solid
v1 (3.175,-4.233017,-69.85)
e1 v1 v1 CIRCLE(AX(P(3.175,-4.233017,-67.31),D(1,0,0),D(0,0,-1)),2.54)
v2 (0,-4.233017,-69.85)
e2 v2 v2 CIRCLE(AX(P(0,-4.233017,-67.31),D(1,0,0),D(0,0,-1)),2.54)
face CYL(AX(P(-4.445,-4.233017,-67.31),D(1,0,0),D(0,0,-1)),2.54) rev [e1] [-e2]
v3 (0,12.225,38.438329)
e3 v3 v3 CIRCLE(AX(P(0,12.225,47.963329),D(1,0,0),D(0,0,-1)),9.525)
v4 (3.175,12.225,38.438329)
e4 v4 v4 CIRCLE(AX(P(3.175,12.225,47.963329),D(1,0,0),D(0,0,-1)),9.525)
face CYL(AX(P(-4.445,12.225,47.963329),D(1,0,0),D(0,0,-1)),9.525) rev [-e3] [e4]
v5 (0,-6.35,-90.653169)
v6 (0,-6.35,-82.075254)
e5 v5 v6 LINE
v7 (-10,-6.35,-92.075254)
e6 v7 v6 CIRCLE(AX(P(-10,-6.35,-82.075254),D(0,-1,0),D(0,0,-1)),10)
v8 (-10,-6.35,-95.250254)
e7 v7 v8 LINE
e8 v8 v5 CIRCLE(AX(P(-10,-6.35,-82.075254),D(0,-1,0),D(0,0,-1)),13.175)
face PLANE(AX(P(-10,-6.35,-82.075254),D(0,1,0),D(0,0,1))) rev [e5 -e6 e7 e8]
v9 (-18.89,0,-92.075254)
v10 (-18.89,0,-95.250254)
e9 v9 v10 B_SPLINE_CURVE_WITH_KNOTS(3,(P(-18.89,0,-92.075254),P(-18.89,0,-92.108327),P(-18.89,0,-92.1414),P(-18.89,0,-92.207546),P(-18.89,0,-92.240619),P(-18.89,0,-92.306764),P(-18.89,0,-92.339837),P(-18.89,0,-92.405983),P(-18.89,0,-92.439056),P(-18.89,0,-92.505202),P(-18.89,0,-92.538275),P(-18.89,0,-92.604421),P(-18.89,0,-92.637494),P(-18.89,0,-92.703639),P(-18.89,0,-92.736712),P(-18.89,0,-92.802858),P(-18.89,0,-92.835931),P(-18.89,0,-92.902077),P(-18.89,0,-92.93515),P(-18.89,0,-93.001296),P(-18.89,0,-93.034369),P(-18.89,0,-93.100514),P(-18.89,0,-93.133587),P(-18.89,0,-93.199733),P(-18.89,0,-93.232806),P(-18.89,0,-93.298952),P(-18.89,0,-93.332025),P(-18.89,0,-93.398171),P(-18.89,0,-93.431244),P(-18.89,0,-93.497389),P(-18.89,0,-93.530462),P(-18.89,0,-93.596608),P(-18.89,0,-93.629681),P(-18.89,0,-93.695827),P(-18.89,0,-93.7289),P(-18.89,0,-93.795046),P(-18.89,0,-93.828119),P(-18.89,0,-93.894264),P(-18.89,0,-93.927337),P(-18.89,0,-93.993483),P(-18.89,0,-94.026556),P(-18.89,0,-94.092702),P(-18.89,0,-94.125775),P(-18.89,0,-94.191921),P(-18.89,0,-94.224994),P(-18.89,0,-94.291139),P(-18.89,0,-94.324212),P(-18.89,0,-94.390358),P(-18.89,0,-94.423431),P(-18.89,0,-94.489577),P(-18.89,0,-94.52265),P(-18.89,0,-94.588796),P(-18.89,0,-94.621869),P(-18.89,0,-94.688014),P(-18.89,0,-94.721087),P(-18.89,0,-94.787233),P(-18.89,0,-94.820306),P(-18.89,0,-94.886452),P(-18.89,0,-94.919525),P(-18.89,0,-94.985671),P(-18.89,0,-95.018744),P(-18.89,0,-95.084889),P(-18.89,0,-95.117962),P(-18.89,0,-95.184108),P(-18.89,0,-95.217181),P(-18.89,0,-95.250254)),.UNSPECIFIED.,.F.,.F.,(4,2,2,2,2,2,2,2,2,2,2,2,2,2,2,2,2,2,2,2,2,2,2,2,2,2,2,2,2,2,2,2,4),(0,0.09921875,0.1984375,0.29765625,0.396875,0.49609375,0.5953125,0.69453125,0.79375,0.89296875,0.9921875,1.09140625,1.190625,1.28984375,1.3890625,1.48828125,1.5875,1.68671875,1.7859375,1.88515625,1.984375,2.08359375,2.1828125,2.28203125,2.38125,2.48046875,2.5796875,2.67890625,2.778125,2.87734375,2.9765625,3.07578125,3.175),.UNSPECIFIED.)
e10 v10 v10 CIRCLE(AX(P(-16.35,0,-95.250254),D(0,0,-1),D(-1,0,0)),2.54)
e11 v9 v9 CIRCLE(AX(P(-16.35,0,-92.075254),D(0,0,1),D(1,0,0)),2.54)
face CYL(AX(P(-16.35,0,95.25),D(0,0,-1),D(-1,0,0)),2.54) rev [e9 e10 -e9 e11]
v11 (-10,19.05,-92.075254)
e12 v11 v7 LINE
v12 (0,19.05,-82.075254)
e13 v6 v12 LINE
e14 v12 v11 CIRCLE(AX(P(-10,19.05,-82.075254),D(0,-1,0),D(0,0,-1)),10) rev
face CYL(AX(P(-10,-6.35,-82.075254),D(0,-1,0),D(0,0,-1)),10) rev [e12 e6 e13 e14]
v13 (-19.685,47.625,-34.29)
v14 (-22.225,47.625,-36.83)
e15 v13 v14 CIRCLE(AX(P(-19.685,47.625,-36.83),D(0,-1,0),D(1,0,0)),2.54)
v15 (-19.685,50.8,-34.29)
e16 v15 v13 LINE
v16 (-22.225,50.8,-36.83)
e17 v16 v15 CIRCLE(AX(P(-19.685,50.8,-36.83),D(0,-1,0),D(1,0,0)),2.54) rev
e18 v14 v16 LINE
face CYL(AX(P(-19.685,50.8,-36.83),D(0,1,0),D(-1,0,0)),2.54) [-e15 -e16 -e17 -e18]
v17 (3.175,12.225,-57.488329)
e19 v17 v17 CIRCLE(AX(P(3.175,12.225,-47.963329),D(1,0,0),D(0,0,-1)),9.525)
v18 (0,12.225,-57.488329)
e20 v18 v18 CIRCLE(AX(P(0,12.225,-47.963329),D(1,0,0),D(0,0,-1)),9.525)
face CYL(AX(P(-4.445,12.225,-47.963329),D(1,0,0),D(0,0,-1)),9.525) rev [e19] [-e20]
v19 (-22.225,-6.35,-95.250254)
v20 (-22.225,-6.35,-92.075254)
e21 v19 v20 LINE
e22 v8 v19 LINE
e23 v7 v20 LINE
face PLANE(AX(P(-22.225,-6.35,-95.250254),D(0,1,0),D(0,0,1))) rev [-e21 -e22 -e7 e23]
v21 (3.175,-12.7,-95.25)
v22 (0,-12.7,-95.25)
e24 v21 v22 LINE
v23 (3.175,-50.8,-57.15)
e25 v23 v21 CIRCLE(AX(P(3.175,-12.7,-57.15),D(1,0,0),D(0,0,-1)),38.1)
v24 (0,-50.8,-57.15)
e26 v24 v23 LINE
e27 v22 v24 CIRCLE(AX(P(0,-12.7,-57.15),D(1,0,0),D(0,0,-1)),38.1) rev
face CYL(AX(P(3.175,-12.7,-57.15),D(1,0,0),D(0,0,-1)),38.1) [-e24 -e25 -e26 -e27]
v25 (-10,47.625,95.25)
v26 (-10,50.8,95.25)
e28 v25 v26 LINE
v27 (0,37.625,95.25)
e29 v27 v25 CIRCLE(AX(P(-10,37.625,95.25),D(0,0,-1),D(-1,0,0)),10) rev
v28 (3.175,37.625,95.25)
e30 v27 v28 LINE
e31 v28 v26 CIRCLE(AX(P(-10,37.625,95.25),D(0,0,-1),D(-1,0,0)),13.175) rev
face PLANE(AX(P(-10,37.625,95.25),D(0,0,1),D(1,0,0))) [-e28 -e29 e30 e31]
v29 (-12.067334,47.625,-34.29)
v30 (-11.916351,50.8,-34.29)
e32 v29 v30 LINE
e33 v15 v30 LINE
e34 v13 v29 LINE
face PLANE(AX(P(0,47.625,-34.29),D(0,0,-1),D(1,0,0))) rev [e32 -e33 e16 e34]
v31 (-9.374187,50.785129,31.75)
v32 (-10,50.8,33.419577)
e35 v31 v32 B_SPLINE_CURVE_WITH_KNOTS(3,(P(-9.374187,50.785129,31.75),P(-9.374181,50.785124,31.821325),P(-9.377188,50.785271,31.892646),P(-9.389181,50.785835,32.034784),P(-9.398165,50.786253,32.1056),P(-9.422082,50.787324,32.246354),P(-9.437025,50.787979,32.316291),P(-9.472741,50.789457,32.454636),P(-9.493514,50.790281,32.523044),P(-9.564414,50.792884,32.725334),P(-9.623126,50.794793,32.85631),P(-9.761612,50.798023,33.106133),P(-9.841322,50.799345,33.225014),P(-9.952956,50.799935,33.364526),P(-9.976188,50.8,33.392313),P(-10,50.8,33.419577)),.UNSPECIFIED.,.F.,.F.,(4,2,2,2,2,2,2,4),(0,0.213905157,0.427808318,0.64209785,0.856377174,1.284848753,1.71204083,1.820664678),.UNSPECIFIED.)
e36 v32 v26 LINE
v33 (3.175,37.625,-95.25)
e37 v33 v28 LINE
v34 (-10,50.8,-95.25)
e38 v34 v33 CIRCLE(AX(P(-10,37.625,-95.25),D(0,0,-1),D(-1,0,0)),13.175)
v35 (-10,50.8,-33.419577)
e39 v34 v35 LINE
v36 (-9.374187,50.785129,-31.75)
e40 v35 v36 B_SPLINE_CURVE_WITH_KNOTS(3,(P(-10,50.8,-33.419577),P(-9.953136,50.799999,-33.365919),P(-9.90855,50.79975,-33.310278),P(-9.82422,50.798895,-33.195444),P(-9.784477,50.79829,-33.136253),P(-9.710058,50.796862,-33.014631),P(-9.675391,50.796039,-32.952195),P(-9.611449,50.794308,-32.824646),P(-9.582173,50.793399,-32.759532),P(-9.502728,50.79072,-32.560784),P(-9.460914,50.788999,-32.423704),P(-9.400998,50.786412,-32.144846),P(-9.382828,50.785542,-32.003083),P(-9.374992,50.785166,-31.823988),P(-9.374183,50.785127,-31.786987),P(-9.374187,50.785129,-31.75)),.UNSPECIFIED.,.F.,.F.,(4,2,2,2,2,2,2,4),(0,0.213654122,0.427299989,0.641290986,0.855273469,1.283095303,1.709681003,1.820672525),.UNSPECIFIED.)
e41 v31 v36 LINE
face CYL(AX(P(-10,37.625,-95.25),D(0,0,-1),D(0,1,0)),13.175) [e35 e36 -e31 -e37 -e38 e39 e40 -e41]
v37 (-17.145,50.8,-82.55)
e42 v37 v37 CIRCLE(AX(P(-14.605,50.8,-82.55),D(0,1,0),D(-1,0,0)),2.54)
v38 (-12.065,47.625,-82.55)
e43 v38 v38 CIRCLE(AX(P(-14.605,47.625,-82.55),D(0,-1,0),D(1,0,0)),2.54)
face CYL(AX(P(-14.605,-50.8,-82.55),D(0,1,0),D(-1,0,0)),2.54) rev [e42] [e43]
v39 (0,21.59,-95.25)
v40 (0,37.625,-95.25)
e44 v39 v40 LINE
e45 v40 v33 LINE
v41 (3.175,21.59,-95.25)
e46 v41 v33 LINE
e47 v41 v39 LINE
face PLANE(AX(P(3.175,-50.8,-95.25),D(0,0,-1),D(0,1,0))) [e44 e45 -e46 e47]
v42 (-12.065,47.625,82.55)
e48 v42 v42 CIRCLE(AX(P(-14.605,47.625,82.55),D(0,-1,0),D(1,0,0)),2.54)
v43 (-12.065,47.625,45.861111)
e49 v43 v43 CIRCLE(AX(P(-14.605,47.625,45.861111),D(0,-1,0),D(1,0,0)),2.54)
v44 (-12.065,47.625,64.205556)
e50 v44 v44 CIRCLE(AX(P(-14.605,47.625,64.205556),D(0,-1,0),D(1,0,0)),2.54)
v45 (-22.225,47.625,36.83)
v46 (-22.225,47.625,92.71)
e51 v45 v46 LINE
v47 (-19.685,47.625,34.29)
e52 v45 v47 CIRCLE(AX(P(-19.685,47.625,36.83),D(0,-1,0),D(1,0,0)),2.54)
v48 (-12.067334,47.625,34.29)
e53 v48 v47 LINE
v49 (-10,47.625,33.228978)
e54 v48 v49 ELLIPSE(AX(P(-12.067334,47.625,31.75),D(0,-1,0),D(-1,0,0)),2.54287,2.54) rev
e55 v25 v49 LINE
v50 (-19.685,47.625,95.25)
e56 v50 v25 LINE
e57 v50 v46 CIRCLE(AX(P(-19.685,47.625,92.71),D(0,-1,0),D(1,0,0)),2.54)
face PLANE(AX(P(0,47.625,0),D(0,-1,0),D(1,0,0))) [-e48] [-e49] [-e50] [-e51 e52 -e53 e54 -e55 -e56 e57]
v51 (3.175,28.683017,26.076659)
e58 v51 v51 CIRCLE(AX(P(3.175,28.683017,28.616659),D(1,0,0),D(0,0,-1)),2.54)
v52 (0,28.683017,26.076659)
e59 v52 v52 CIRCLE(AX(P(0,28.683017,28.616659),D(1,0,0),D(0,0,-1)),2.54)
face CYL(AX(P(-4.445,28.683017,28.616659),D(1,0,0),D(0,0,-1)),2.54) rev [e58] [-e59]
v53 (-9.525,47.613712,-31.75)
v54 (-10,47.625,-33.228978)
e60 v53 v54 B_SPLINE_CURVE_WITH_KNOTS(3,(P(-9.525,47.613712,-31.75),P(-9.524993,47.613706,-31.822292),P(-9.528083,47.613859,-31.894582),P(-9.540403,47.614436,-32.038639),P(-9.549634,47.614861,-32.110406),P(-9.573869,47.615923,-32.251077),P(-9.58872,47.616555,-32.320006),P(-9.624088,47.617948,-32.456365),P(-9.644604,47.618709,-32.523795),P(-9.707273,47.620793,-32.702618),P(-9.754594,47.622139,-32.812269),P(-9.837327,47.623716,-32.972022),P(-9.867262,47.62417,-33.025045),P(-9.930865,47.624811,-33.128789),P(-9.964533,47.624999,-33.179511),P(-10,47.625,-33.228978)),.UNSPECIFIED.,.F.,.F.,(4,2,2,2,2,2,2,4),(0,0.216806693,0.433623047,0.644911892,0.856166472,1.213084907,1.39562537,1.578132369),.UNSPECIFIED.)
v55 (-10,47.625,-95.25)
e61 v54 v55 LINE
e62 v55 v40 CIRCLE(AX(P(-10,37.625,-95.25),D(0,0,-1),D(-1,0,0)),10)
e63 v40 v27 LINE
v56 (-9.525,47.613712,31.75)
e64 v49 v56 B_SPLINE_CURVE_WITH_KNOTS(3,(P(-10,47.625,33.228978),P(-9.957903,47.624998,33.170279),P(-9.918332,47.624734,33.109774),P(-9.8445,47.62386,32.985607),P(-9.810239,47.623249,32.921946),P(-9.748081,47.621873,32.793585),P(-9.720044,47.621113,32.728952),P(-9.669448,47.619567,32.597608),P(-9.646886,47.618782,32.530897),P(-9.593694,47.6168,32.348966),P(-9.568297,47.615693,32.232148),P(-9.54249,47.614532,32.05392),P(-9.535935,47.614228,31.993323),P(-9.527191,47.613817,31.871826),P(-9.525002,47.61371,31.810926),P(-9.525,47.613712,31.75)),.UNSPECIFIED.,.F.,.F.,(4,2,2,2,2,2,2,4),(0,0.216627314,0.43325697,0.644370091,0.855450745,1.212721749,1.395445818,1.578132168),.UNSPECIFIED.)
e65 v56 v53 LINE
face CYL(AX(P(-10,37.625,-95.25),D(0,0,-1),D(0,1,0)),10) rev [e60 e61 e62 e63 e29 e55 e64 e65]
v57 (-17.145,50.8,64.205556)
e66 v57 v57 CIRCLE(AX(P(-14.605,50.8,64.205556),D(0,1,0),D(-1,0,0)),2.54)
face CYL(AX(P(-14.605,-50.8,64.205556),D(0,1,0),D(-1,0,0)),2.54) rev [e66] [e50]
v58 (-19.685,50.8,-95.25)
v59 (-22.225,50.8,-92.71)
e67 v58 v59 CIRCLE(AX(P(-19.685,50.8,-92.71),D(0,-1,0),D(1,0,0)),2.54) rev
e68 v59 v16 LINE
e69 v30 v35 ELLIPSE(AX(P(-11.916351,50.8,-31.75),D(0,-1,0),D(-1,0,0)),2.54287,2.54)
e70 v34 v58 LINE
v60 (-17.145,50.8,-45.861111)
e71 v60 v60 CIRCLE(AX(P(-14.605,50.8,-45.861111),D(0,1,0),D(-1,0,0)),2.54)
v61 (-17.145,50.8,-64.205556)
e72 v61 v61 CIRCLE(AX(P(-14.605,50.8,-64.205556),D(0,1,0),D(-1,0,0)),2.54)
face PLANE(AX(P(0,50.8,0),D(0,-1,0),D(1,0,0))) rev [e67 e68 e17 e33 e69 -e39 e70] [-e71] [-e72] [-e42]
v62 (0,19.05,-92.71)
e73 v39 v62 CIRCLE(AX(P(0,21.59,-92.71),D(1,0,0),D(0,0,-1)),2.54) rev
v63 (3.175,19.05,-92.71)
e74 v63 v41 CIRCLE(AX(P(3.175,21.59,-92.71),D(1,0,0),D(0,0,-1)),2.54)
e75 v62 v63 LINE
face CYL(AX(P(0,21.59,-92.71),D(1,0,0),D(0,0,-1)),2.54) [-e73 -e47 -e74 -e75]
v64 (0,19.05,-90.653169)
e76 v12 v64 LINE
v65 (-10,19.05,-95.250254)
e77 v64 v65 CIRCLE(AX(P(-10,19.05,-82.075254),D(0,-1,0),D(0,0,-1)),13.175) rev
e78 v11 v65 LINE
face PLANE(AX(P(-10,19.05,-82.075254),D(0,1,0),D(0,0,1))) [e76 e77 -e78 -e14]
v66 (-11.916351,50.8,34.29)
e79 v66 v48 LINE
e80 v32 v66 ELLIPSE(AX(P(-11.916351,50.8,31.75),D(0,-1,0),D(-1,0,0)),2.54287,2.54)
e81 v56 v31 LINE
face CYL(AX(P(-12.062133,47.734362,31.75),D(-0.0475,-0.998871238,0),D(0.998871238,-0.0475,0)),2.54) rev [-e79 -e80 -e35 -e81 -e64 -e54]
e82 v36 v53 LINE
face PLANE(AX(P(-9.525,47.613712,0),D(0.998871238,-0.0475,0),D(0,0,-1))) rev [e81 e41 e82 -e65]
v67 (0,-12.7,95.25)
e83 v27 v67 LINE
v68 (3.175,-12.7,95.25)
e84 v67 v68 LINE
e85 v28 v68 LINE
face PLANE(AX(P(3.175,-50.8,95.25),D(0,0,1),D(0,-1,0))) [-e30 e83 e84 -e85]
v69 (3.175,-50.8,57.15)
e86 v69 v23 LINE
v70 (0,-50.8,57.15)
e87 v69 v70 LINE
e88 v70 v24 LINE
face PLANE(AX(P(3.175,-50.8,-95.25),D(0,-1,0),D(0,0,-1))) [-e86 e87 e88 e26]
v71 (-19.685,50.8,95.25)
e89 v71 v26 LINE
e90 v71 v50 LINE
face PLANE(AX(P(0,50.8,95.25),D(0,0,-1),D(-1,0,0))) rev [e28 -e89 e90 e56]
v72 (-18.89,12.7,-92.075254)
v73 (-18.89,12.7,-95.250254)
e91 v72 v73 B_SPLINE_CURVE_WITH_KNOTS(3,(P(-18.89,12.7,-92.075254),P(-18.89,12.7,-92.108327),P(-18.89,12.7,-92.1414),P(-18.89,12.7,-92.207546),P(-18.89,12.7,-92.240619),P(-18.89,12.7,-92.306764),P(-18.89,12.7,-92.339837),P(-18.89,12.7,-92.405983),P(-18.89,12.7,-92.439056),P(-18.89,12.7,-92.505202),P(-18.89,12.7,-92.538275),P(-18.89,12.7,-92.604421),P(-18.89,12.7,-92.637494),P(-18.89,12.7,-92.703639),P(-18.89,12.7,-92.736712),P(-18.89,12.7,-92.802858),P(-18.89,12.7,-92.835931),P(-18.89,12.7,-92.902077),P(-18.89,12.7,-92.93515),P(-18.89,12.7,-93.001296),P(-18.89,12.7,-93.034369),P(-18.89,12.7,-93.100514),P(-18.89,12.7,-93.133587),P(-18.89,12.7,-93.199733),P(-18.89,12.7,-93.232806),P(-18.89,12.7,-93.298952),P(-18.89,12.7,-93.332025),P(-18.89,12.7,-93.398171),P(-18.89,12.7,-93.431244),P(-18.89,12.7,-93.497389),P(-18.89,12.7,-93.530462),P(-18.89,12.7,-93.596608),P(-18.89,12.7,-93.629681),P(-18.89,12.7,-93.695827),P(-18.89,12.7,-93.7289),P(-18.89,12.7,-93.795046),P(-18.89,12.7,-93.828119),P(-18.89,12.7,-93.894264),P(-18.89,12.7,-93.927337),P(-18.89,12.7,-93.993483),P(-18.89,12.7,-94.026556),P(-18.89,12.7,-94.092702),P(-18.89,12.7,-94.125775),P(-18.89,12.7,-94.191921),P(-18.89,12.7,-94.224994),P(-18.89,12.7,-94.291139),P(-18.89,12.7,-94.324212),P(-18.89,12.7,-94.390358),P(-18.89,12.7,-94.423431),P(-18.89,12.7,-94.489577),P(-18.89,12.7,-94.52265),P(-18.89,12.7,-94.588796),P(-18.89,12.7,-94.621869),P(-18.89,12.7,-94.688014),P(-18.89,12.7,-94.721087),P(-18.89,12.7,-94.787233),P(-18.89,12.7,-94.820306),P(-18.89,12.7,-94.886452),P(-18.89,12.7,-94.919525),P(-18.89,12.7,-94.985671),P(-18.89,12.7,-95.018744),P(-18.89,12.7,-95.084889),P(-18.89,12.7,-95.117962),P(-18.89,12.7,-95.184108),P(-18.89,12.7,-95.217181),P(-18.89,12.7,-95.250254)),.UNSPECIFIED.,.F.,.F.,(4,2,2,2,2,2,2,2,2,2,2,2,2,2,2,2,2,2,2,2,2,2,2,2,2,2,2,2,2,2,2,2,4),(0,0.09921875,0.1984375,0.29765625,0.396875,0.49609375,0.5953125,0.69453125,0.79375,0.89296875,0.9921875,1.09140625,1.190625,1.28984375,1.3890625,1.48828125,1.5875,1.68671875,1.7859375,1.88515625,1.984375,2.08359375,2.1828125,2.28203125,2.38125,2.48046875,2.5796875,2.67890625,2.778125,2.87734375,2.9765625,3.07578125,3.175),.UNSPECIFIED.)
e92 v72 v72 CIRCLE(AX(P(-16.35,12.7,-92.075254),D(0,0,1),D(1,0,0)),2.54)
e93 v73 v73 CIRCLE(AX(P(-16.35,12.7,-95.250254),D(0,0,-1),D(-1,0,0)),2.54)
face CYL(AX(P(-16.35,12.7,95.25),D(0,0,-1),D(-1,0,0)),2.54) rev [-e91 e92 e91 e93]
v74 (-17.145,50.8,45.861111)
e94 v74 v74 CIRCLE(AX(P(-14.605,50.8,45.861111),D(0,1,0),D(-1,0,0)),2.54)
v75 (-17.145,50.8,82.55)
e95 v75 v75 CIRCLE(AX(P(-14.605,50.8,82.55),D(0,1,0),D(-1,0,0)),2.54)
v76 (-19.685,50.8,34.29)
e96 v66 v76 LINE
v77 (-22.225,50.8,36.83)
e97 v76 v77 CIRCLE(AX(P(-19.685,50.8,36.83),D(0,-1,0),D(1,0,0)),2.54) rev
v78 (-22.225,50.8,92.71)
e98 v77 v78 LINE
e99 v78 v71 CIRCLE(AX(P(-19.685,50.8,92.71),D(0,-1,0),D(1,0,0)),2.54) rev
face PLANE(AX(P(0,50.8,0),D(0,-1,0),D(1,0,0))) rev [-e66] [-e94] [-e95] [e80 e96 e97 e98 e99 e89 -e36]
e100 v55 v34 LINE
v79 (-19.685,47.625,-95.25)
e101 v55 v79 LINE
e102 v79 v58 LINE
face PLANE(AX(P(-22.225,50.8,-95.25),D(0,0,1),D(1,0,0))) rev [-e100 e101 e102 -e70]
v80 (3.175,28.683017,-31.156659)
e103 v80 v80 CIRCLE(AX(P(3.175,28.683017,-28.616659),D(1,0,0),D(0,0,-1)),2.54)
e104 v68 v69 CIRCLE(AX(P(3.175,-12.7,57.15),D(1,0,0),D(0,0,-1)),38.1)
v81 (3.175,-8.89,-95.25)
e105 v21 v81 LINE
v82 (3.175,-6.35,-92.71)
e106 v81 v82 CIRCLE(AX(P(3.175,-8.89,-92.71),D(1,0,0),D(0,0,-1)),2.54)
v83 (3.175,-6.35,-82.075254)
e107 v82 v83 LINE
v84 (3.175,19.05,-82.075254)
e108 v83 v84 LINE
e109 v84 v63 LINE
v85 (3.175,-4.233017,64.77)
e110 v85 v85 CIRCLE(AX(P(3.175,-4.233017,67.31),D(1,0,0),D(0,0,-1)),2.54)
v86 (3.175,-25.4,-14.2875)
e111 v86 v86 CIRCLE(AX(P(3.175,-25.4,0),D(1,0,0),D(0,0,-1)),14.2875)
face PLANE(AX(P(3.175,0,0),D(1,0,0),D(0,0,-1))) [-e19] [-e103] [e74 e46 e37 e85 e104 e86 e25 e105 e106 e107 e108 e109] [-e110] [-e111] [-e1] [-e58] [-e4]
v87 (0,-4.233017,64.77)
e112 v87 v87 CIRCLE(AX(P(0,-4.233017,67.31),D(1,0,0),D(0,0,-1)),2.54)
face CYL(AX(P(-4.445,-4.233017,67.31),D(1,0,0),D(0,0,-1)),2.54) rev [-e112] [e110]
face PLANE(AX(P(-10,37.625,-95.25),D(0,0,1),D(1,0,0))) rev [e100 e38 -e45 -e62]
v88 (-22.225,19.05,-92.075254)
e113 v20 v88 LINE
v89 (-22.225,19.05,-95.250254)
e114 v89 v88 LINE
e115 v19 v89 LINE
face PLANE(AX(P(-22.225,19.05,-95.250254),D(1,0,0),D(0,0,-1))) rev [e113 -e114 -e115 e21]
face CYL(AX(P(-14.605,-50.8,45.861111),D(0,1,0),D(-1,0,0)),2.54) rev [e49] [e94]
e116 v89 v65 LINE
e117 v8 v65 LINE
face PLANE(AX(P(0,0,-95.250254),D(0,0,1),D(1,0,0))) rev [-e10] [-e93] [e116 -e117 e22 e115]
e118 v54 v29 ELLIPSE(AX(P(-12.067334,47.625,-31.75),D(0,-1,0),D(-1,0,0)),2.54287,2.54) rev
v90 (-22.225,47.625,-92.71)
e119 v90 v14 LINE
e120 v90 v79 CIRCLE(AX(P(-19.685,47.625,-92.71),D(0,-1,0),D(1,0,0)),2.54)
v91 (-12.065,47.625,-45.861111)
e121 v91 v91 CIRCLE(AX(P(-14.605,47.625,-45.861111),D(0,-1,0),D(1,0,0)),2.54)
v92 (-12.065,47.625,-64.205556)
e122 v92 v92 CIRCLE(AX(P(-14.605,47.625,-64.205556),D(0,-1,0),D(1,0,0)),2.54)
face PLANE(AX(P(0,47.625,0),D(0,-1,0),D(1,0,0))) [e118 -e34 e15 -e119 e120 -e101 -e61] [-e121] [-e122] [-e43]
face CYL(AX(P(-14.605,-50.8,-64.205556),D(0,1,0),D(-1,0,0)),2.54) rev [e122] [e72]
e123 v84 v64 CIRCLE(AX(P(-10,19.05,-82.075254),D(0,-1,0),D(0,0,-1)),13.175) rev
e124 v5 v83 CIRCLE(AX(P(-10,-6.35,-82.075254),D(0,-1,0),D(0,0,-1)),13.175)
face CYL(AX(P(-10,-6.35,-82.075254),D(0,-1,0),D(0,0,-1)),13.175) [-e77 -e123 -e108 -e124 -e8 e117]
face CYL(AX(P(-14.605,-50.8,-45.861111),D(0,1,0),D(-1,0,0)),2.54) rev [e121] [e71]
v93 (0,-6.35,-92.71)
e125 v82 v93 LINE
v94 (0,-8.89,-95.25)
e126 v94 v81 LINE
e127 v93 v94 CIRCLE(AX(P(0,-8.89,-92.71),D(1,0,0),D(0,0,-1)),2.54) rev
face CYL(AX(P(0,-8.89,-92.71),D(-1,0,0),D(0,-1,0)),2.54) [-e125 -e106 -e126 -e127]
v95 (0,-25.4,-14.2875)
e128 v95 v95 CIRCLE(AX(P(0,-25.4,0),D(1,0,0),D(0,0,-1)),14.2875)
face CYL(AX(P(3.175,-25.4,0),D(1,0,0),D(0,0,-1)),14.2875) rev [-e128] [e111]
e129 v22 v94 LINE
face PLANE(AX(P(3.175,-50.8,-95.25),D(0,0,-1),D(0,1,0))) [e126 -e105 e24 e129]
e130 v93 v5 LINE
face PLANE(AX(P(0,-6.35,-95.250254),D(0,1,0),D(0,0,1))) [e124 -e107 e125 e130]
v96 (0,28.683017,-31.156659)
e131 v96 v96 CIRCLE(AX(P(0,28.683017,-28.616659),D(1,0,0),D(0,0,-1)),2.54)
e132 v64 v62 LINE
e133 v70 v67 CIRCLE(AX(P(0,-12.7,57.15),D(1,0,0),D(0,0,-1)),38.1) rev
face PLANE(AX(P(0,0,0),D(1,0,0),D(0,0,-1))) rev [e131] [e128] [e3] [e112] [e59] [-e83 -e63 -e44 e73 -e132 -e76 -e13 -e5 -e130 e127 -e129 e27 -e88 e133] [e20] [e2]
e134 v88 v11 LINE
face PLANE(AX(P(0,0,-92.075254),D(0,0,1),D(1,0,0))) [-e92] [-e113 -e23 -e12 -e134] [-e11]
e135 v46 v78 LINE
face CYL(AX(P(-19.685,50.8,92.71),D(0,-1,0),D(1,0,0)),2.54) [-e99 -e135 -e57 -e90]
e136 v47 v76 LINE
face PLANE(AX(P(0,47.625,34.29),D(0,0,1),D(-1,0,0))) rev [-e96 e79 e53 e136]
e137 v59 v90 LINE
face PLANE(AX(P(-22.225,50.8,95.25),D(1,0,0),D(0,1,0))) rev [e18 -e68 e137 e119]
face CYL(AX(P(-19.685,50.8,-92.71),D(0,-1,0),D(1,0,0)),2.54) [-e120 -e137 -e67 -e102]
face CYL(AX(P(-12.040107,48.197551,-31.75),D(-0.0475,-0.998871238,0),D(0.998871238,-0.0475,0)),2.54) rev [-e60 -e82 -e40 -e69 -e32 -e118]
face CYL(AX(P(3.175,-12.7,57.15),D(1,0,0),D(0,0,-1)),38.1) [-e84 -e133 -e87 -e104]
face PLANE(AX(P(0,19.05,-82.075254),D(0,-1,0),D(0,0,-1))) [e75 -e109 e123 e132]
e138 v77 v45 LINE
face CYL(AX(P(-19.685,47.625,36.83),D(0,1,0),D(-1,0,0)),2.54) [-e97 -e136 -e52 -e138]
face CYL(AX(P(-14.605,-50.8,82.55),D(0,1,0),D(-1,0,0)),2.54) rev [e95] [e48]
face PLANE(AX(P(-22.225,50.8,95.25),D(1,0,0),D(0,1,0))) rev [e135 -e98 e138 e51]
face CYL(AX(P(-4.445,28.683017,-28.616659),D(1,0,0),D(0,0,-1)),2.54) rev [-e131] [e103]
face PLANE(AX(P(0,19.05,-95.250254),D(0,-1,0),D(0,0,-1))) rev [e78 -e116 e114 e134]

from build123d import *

# Parameters (mm, degrees)
SKETCH1_W                    = 190.5
SKETCH1_H                    = 101.6
BOSS_EXTRUDE1_DEPTH          = 3.175
SKETCH2_R                    = 14.2875
CUT_EXTRUDE1_DEPTH           = 3.175
EDGE_FLANGE1_STRIP_W         = 32.7
EDGE_FLANGE1_STRIP_H         = 3.175
EDGE_FLANGE1_STRIP_CUT_DEPTH = 190.5
EDGE_FLANGE1_DEPTH           = 190.5
SKETCH12_R                   = 9.525
SKETCH12_R_2                 = 2.54
CUT_EXTRUDE2_DEPTH           = 7.62
FILLET1_R                    = 38.1
SKETCH13_W                   = 3.175
SKETCH13_H                   = 25.4
BOSS_EXTRUDE2_DEPTH          = 0.000254
EDGE_FLANGE2_STRIP_W         = 32.7
EDGE_FLANGE2_STRIP_H         = 3.175
EDGE_FLANGE2_STRIP_CUT_DEPTH = 25.4
EDGE_FLANGE2_DEPTH           = 25.4
SKETCH17_R                   = 2.54
CUT_EXTRUDE3_DEPTH           = 142.028796748
SKETCH18_R                   = 2.54
CUT_EXTRUDE4_DEPTH           = 199.405991339
CUT_EXTRUDE5_START           = -34.29
CUT_EXTRUDE5_DEPTH           = 68.58
FILLET3_R                    = 2.54
FILLET4_R                    = 2.54


# Read off the part's stored shape, not the designer's step: Cut-Extrude5
# Sheet-metal steps are written as plain solids
with BuildPart() as part:
    # Sketch1 → Boss-Extrude1 (new body)
    with BuildSketch(Plane(origin=(0, 0, 0), x_dir=(0, 0, -1), z_dir=(1, 0, 0))):
        Rectangle(SKETCH1_W, SKETCH1_H)
    extrude(amount=BOSS_EXTRUDE1_DEPTH)

    # Sketch2 → Cut-Extrude1 (cut)
    with BuildSketch(Plane(origin=(3.175, 0, 0), x_dir=(0, 0, -1), z_dir=(1, 0, 0))):
        with Locations((0, -25.4)):
            Circle(SKETCH2_R)
    extrude(amount=-CUT_EXTRUDE1_DEPTH, mode=Mode.SUBTRACT)

    # Edge-Flange1 strip (across the edge) → Edge-Flange1 strip cut (cut)
    with BuildSketch(Plane(origin=(0, 50.8, 95.25), x_dir=(0, -1, 0), z_dir=(0, 0, -1))):
        with Locations((-3.175, -1.5875)):
            Rectangle(EDGE_FLANGE1_STRIP_W, EDGE_FLANGE1_STRIP_H)
    extrude(amount=EDGE_FLANGE1_STRIP_CUT_DEPTH, mode=Mode.SUBTRACT)

    # Edge-Flange1 section (across the edge) → Edge-Flange1 (add)
    with BuildSketch(Plane(origin=(0, 50.8, 95.25), x_dir=(0, -1, 0), z_dir=(0, 0, -1))):
        with BuildLine():
            Line((0, 10), (0, 22.225))
            Line((0, 22.225), (3.175, 22.225))
            Line((3.175, 22.225), (3.175, 10))
            ThreePointArc((3.175, 10), (6.103932188, 2.928932188), (13.175, 0))
            Line((13.175, 0), (13.175, -3.175))
            ThreePointArc((13.175, -3.175), (3.858868158, 0.683868158), (0, 10))
        make_face()
    extrude(amount=EDGE_FLANGE1_DEPTH)

    # Sketch12 → Cut-Extrude2 (cut)
    with BuildSketch(Plane(origin=(3.175, 0, 0), x_dir=(0, 0, -1), z_dir=(1, 0, 0))):
        with Locations((-47.963329482, 12.225)):
            Circle(SKETCH12_R)
        with Locations((-28.616658964, 28.683017495)):
            Circle(SKETCH12_R_2)
        with Locations((-67.31, -4.233017495)):
            Circle(SKETCH12_R_2)
        with Locations((47.963329482, 12.225)):
            Circle(SKETCH12_R)
        with Locations((28.616658964, 28.683017495)):
            Circle(SKETCH12_R_2)
        with Locations((67.31, -4.233017495)):
            Circle(SKETCH12_R_2)
    extrude(amount=-CUT_EXTRUDE2_DEPTH, mode=Mode.SUBTRACT)

    # Fillet1
    fillet1_edges = [part.edges().sort_by_distance(p)[0] for p in [
        (1.5875, -50.8, 95.25),
        (1.5875, -50.8, -95.25),
    ]]
    fillet(fillet1_edges, radius=FILLET1_R)

    # Sketch13 → Boss-Extrude2 (add)
    with BuildSketch(Plane(origin=(0, 0, -95.25), x_dir=(-1, 0, 0), z_dir=(0, 0, -1))):
        with Locations((-1.5875, 6.35)):
            Rectangle(SKETCH13_W, SKETCH13_H)
    extrude(amount=BOSS_EXTRUDE2_DEPTH)

    # Edge-Flange2 strip (across the edge) → Edge-Flange2 strip cut (cut)
    with BuildSketch(Plane(origin=(0, 19.05, -95.250254), x_dir=(0, 0, 1), z_dir=(0, -1, 0))):
        with Locations((-3.175, -1.5875)):
            Rectangle(EDGE_FLANGE2_STRIP_W, EDGE_FLANGE2_STRIP_H)
    extrude(amount=EDGE_FLANGE2_STRIP_CUT_DEPTH, mode=Mode.SUBTRACT)

    # Edge-Flange2 section (across the edge) → Edge-Flange2 (add)
    with BuildSketch(Plane(origin=(0, 19.05, -95.250254), x_dir=(0, 0, 1), z_dir=(0, -1, 0))):
        with BuildLine():
            Line((0, 10), (0, 22.225))
            Line((0, 22.225), (3.175, 22.225))
            Line((3.175, 22.225), (3.175, 10))
            ThreePointArc((3.175, 10), (6.103932188, 2.928932188), (13.175, 0))
            Line((13.175, 0), (13.175, -3.175))
            ThreePointArc((13.175, -3.175), (3.858868158, 0.683868158), (0, 10))
        make_face()
    extrude(amount=EDGE_FLANGE2_DEPTH)

    # Sketch17 → Cut-Extrude3 (cut, through all)
    with BuildSketch(Plane(origin=(0, 50.8, 0), x_dir=(1, 0, 0), z_dir=(0, 1, 0))):
        with Locations(Location((-14.605, 82.55, 0), (0, 0, 180))):
            Circle(SKETCH17_R)
        with Locations(Location((-14.605, 64.205555556, 0), (0, 0, 180))):
            Circle(SKETCH17_R)
        with Locations(Location((-14.605, 45.861111111, 0), (0, 0, 180))):
            Circle(SKETCH17_R)
        with Locations(Location((-14.605, 27.516666667, 0), (0, 0, 180))):
            Circle(SKETCH17_R)
        with Locations(Location((-14.605, 9.172222222, 0), (0, 0, 180))):
            Circle(SKETCH17_R)
        with Locations(Location((-14.605, -9.172222222, 0), (0, 0, 180))):
            Circle(SKETCH17_R)
        with Locations(Location((-14.605, -27.516666667, 0), (0, 0, 180))):
            Circle(SKETCH17_R)
        with Locations(Location((-14.605, -45.861111111, 0), (0, 0, 180))):
            Circle(SKETCH17_R)
        with Locations(Location((-14.605, -64.205555556, 0), (0, 0, 180))):
            Circle(SKETCH17_R)
        with Locations(Location((-14.605, -82.55, 0), (0, 0, 180))):
            Circle(SKETCH17_R)
    extrude(amount=-CUT_EXTRUDE3_DEPTH, mode=Mode.SUBTRACT)

    # Sketch18 → Cut-Extrude4 (cut, through all)
    with BuildSketch(Plane(origin=(0, 0, -95.250254), x_dir=(-1, 0, 0), z_dir=(0, 0, -1))):
        with Locations((16.35, 12.7)):
            Circle(SKETCH18_R)
        with Locations((16.35, 0)):
            Circle(SKETCH18_R)
    extrude(amount=-CUT_EXTRUDE4_DEPTH, mode=Mode.SUBTRACT)

    # Cut-Extrude5 outline → Cut-Extrude5 (cut)
    with BuildSketch(Plane.XY.offset(CUT_EXTRUDE5_START)):
        with BuildLine():
            ThreePointArc((-10, 47.625), (-9.762432951, 47.622177697), (-9.525, 47.61371238))
            Line((-9.525, 47.61371238), (-9.3741875, 50.78512856))
            ThreePointArc((-9.3741875, 50.78512856), (-9.687005413, 50.796281615), (-10, 50.8))
            Line((-10, 50.8), (-22.225, 50.8))
            Line((-22.225, 50.8), (-22.225, 47.625))
            Line((-22.225, 47.625), (-10, 47.625))
        make_face()
    extrude(amount=CUT_EXTRUDE5_DEPTH, mode=Mode.SUBTRACT)

    # Fillet3
    fillet3_edges = [part.edges().sort_by_distance(p)[0] for p in [
        (-22.225, 49.2125, 95.25),
        (-22.225, 49.2125, 34.29),
        (-9.44959375, 49.19942047, 34.29),
        (-9.44959375, 49.19942047, -34.29),
        (-22.225, 49.2125, -34.29),
        (-22.225, 49.2125, -95.25),
    ]]
    fillet(fillet3_edges, radius=FILLET3_R)

    # Fillet4
    fillet4_edges = [part.edges().sort_by_distance(p)[0] for p in [
        (1.5875, -6.35, -95.25),
        (1.5875, 19.05, -95.25),
    ]]
    fillet(fillet4_edges, radius=FILLET4_R)


solid = part.part
